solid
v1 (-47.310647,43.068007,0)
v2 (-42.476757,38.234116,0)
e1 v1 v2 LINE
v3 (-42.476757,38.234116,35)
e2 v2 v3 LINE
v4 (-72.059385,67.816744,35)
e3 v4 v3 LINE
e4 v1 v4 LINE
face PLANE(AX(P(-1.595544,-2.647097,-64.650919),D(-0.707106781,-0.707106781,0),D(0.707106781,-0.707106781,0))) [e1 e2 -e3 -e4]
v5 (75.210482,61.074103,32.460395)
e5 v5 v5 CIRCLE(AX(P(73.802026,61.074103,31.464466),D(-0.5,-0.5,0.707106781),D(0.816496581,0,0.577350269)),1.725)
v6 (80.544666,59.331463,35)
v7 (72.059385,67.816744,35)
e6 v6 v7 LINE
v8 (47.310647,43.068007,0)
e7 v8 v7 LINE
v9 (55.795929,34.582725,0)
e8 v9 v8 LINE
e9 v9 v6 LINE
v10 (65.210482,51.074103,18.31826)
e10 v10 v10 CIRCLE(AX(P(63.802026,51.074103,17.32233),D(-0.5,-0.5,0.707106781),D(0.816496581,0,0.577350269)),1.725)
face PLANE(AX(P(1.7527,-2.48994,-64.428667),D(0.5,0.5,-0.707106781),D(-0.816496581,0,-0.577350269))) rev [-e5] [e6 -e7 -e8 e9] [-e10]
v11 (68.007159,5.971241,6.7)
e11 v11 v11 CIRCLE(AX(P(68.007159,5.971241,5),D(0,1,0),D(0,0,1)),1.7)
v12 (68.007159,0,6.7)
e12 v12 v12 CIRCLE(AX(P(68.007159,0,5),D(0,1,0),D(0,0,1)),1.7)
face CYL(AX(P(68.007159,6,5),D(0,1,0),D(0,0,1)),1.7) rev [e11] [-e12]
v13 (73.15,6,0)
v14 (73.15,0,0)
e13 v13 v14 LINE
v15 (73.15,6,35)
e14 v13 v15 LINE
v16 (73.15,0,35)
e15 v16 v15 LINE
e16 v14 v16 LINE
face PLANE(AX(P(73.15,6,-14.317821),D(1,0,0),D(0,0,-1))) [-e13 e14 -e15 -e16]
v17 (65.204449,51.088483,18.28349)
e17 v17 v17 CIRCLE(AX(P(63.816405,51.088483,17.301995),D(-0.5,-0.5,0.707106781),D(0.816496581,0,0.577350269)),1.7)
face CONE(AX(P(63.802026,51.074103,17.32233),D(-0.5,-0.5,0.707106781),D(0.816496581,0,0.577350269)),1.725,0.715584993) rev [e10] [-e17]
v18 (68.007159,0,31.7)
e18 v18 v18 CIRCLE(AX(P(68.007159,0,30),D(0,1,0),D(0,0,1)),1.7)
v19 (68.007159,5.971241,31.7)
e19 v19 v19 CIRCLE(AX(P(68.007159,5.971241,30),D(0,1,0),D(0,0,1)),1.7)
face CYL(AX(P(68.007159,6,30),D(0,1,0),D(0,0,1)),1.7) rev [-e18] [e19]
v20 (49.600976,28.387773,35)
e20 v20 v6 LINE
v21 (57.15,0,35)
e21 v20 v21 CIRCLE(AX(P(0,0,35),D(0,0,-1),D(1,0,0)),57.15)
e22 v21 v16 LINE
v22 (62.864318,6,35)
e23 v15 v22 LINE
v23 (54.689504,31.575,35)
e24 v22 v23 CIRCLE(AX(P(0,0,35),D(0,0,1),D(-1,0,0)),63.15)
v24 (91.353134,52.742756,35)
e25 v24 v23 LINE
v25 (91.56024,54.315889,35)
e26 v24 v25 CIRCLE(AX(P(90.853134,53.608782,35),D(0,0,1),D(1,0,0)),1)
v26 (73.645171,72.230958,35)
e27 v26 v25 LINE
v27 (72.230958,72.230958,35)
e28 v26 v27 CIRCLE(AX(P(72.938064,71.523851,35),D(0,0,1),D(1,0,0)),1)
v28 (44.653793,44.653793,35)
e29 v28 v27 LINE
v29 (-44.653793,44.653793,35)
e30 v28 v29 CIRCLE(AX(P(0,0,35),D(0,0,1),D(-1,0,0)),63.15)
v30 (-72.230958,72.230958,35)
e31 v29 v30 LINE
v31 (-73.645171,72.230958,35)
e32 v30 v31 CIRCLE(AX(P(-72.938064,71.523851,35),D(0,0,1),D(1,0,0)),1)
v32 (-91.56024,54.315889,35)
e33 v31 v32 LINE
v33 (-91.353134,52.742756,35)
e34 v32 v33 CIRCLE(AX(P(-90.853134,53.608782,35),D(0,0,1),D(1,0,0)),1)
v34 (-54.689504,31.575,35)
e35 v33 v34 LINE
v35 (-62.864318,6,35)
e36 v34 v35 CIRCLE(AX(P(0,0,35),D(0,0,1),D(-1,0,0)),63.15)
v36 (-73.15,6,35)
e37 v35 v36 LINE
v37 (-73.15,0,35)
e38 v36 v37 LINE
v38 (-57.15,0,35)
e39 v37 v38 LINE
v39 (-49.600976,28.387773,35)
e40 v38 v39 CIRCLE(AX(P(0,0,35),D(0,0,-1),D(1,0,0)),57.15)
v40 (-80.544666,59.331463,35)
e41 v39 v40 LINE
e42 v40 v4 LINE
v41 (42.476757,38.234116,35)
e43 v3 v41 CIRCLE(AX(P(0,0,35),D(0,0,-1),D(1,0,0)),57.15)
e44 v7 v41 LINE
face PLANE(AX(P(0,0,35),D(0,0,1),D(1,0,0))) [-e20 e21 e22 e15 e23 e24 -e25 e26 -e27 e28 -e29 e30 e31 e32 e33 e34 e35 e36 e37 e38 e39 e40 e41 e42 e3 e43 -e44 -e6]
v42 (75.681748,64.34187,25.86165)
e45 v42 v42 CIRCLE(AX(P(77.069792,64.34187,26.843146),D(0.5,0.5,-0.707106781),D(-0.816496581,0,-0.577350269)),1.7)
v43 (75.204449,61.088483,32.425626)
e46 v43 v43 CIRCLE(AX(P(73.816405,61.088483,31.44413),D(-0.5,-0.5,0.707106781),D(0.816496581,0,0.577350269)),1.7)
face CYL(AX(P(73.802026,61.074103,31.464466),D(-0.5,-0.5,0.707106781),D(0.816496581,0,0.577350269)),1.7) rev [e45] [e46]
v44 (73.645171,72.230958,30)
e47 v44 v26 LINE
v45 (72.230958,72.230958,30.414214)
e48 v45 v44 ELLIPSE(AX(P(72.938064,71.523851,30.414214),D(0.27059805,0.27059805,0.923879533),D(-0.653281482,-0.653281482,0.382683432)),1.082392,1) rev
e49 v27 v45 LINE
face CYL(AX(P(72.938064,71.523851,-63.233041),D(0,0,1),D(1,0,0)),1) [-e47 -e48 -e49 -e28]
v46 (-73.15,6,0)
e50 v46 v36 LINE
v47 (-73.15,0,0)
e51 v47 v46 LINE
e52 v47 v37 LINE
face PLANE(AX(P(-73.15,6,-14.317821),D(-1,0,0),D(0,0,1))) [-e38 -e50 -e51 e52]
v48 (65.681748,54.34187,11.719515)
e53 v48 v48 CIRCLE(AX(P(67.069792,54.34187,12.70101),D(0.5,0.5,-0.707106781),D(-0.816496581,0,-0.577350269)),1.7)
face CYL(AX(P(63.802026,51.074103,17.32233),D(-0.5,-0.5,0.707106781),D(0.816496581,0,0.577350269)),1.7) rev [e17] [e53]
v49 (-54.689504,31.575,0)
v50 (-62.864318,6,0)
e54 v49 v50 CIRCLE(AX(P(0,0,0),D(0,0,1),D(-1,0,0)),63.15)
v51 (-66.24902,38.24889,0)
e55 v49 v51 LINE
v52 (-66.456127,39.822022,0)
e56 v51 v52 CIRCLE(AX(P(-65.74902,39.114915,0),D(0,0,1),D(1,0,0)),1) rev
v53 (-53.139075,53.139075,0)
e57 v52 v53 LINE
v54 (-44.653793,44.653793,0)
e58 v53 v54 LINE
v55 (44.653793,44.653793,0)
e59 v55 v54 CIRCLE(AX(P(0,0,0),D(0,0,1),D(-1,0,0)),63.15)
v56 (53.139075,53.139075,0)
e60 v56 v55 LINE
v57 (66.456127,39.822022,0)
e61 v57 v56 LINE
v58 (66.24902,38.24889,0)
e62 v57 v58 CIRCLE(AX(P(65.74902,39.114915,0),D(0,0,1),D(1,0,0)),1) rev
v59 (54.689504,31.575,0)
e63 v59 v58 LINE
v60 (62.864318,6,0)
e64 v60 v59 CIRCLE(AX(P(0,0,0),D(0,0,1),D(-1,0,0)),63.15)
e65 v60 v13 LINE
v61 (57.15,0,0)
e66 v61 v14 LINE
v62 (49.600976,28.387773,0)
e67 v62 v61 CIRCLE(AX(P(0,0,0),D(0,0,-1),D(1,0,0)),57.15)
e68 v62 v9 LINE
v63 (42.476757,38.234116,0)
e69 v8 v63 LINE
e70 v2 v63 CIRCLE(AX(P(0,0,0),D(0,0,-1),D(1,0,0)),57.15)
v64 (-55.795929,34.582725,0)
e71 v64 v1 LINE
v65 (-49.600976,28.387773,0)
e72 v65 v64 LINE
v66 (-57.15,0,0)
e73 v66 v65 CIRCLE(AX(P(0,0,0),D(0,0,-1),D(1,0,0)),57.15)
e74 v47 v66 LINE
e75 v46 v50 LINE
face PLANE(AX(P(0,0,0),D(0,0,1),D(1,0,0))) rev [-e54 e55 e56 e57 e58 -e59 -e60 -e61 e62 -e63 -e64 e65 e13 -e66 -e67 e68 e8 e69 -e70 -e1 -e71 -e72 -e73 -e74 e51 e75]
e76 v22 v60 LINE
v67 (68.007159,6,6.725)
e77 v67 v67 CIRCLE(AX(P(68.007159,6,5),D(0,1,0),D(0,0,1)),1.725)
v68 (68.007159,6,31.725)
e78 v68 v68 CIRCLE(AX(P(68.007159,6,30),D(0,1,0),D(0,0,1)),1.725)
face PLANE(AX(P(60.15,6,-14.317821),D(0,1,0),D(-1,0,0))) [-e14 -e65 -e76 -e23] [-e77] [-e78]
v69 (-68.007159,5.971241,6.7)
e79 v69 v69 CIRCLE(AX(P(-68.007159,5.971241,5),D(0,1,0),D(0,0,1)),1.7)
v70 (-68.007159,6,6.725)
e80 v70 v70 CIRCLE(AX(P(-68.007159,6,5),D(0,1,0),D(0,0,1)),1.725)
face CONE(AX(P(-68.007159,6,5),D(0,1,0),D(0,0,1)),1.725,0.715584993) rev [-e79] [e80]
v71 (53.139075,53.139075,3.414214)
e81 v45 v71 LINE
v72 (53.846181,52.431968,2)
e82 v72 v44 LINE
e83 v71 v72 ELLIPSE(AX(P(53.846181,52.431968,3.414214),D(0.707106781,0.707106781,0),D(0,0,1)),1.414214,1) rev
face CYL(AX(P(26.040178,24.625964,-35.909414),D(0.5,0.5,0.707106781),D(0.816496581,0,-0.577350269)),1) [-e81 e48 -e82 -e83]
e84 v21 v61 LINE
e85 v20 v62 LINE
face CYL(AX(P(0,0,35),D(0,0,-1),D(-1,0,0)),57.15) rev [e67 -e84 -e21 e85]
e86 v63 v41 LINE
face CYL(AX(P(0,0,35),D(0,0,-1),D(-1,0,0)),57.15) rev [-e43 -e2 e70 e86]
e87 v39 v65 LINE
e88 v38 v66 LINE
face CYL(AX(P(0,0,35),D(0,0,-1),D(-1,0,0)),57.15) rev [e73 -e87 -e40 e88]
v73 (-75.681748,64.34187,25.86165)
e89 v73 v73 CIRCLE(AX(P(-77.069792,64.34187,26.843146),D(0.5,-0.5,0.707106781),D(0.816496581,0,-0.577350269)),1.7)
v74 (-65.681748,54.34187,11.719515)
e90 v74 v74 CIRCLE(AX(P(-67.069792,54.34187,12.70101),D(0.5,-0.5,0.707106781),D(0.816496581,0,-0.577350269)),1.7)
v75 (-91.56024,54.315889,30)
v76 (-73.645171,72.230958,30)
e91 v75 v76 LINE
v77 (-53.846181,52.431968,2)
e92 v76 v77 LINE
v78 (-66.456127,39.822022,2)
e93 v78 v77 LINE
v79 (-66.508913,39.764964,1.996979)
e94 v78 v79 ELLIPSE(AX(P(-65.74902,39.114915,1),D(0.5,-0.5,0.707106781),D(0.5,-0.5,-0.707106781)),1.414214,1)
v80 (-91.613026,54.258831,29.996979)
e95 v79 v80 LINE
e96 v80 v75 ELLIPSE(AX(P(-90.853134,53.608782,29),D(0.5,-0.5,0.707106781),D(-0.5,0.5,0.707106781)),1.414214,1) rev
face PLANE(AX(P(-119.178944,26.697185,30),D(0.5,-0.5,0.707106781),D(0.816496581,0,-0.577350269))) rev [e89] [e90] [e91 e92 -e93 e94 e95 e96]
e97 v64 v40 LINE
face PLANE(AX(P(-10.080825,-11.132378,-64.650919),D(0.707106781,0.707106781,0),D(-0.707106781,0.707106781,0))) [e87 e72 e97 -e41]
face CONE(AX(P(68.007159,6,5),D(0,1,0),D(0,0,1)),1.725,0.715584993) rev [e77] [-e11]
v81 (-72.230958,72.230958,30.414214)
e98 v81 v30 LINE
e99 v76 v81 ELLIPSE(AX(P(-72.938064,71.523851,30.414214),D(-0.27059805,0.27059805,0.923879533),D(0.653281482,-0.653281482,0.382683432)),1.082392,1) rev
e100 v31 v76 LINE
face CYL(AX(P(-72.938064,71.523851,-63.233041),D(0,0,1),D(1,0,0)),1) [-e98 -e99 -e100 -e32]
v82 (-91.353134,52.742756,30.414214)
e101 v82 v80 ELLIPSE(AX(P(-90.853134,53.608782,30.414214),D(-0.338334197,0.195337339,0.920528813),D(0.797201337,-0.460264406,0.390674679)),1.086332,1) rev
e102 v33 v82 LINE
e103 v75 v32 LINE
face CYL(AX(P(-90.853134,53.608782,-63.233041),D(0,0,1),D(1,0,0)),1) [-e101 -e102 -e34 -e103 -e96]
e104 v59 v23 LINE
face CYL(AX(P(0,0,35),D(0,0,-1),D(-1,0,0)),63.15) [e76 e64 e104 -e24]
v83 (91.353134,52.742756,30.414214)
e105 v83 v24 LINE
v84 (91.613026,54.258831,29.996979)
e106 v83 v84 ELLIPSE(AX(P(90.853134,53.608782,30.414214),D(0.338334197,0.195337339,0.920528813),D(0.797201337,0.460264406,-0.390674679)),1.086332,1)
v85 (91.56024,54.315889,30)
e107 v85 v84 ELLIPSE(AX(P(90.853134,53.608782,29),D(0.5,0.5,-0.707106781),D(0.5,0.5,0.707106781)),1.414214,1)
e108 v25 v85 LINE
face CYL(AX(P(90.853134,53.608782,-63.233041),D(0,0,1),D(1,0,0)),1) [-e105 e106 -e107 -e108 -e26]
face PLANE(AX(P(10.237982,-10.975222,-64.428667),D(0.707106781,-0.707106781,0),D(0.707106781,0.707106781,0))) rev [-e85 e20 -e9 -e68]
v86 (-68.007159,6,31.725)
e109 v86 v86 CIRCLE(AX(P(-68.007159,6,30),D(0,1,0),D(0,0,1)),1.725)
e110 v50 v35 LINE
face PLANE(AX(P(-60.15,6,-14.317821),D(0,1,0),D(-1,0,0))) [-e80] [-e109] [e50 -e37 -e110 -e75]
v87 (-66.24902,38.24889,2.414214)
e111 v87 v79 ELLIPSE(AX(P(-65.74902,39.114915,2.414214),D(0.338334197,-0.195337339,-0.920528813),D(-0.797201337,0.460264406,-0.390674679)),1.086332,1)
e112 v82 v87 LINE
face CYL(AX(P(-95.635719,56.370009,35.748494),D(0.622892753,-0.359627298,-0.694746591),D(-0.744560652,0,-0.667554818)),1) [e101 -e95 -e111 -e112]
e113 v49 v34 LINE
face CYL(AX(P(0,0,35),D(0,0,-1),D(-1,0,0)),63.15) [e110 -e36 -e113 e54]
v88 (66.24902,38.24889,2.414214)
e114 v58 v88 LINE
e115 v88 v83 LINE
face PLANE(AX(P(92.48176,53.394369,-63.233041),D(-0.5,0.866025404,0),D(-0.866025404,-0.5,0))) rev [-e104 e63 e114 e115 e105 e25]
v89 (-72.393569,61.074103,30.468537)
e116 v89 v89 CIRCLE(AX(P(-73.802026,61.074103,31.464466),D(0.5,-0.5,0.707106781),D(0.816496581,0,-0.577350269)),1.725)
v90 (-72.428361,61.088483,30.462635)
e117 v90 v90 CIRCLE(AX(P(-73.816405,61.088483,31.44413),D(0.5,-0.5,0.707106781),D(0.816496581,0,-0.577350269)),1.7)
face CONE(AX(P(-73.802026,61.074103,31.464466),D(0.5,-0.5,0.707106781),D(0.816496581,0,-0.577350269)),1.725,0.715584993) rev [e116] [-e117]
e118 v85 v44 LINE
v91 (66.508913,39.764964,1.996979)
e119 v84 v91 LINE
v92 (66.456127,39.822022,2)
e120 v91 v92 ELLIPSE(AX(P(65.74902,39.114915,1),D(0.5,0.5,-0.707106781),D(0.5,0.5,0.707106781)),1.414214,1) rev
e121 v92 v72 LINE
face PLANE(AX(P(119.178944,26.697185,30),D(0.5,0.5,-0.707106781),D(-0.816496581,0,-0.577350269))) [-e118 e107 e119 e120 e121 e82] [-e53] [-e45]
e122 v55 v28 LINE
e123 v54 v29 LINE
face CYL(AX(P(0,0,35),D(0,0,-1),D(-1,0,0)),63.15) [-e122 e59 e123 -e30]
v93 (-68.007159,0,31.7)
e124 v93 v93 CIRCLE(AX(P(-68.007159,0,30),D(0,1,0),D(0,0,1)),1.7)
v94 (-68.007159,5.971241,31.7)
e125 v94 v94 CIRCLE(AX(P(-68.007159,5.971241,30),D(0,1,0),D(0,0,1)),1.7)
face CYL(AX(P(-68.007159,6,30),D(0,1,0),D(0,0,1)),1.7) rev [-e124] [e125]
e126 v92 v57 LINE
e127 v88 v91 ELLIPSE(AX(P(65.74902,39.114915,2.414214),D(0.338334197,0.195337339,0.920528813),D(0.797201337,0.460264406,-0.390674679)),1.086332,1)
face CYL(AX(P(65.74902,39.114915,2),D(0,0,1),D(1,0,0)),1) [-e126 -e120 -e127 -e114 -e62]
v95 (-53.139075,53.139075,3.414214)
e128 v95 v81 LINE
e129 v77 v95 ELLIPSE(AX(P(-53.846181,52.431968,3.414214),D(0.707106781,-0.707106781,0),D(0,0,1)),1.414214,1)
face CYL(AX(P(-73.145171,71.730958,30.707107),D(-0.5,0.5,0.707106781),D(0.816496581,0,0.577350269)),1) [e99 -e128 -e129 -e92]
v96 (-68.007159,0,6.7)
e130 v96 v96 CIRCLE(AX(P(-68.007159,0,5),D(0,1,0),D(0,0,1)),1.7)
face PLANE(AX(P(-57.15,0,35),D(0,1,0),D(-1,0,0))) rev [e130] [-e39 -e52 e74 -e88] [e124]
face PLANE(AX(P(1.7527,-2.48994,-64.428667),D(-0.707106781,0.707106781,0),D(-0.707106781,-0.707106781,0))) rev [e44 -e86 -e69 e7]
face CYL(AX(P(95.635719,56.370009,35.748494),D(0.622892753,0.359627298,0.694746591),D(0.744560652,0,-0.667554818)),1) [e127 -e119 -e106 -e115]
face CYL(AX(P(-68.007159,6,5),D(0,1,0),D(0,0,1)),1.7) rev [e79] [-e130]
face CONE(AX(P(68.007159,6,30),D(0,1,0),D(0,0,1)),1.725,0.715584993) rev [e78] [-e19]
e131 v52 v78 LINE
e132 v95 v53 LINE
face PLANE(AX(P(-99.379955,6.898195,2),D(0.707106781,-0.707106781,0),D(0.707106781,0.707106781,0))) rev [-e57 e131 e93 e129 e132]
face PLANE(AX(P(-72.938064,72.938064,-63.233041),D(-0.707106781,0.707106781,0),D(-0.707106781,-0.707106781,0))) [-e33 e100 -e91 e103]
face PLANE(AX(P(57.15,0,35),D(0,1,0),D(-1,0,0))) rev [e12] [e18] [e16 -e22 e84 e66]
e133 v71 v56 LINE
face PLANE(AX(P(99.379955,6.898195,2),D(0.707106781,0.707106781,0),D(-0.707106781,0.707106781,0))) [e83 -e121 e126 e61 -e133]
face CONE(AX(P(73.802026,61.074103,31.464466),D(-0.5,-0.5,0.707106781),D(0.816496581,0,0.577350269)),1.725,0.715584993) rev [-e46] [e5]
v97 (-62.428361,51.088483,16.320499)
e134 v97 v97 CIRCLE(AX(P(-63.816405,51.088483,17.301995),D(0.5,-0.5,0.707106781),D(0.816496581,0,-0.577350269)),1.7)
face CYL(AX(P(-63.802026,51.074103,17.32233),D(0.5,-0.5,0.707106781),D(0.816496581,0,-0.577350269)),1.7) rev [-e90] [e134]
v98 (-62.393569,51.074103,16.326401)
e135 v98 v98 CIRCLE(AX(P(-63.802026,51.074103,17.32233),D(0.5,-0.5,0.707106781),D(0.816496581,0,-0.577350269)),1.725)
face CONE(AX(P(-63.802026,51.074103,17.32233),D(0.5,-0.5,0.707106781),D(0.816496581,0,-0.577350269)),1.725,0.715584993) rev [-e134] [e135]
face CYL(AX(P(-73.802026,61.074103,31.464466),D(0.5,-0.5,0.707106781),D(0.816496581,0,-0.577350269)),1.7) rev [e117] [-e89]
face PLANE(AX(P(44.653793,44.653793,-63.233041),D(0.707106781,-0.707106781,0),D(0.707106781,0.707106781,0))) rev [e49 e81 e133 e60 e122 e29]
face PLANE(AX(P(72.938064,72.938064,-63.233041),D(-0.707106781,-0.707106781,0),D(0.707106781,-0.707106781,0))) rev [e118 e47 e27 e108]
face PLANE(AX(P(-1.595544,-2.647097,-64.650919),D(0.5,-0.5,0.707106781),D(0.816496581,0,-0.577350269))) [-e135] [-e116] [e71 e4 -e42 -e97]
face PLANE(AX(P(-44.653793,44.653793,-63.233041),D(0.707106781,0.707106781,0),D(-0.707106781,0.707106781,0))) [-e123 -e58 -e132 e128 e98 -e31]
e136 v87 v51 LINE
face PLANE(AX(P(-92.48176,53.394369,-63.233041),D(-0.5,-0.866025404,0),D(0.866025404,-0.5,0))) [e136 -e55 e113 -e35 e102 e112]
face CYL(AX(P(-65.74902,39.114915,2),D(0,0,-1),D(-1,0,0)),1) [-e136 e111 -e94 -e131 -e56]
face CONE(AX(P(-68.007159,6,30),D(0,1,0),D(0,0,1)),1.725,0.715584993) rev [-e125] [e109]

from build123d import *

# Parameters (mm, degrees)
EXTRUDE_1_DEPTH     = 35
EXTRUDE_START       = -35
EXTRUDE_2_DEPTH     = 35
CUT_EXTRUDE_1_DEPTH = 123.873256546
SKETCH_4_W          = 12
SKETCH_4_H          = 35
CUT_EXTRUDE_4_DEPTH = 165.71136734
FILLET_1_R          = 1
FILLET_2_R          = 1
SKETCH_5_W          = 13
SKETCH_5_H          = 6
EXTRUDE_4_DEPTH     = 35


# Read off the part's stored shape, not the designer's step: M3 すきま穴1, M3 すきま穴2
with BuildPart() as part:
    # ｽｹｯﾁ1 → ﾎﾞｽ - 押し出し1 (new body)
    with BuildSketch(Plane.XY):
        with BuildLine():
            Line((57.15, 0), (63.15, 0))
            ThreePointArc((63.15, 0), (0, 63.15), (-63.15, 0))
            Line((-63.15, 0), (-57.15, 0))
            ThreePointArc((-57.15, 0), (0, 57.15), (57.15, 0))
        make_face()
    extrude(amount=EXTRUDE_1_DEPTH)

    # ｽｹｯﾁ2 → ﾎﾞｽ - 押し出し2 (add)
    with BuildSketch(Plane.XY.offset(35).offset(EXTRUDE_START)):
        with BuildLine():
            Line((-44.653793232, 44.653793232), (-72.938064479, 72.938064479))
            Line((-72.938064479, 72.938064479), (-92.481759954, 53.394369005))
            Line((-92.481759954, 53.394369005), (-54.689504249, 31.575))
            ThreePointArc((-54.689504249, 31.575), (-50.100263439, 38.443284242), (-44.653793232, 44.653793232))
        make_face()
    extrude_2 = extrude(amount=EXTRUDE_2_DEPTH)

    # ｽｹｯﾁ3 → ｶｯﾄ - 押し出し1 (cut, through all)
    with BuildSketch(Plane(origin=(0, 0, 0), x_dir=(0, 0, -1), z_dir=(0.7071067811865461, 0.7071067811865489, 0))):
        Polygon((-30, 103.15), (-2, 75.15), (0, 75.15), (0, 103.15), align=None)
    cut_extrude_1 = extrude(amount=-CUT_EXTRUDE_1_DEPTH, mode=Mode.SUBTRACT)

    # ﾐﾗｰ1: ﾎﾞｽ - 押し出し2, ｶｯﾄ - 押し出し1 across plane
    add(extrude_2.mirror(Plane(origin=(0, 0, 0), x_dir=(0, 0, 1), z_dir=(1, 0, 0))))
    add(cut_extrude_1.mirror(Plane(origin=(0, 0, 0), x_dir=(0, 0, 1), z_dir=(1, 0, 0))), mode=Mode.SUBTRACT)

    # ｽｹｯﾁ4 → ｶｯﾄ - 押し出し4 (cut, through all)
    with BuildSketch(Plane(origin=(-48.84340091, 48.84340091, 69.075), x_dir=(-0.707106781186546, -0.707106781186549, 0), z_dir=(0.5000000000000019, -0.4999999999999998, -0.7071067811865465))):
        with Locations((9, 27.689327138)):
            Rectangle(SKETCH_4_W, SKETCH_4_H)
    cut_extrude_4 = extrude(amount=CUT_EXTRUDE_4_DEPTH, mode=Mode.SUBTRACT)

    # ﾌｨﾚｯﾄ1
    fillet_1_edges = [part.edges().sort_by_distance(p)[0] for p in [
        (-72.938064479, 72.938064479, 32.5),
        (-92.481759954, 53.394369005, 32.5),
        (-67.377646733, 38.900502479, 1),
        (-79.929703344, 46.147435742, 16),
        (-63.038569543, 63.038569543, 16),
    ]]
    fillet(fillet_1_edges, radius=FILLET_1_R)

    # ﾐﾗｰ3: ｶｯﾄ - 押し出し4 across plane
    add(cut_extrude_4.mirror(Plane(origin=(0, 0, 0), x_dir=(0, 0, 1), z_dir=(1, 0, 0))), mode=Mode.SUBTRACT)

    # ﾌｨﾚｯﾄ2
    fillet_2_edges = [part.edges().sort_by_distance(p)[0] for p in [
        (72.938064479, 72.938064479, 32.5),
        (92.481759954, 53.394369005, 32.5),
        (63.038569543, 63.038569543, 16),
        (79.929703344, 46.147435742, 16),
        (67.377646733, 38.900502479, 1),
    ]]
    fillet(fillet_2_edges, radius=FILLET_2_R)

    # ｽｹｯﾁ5 → ﾎﾞｽ - 押し出し4 (add)
    with BuildSketch(Plane.XY.offset(35)):
        with Locations((-66.65, 3)):
            Rectangle(SKETCH_5_W, SKETCH_5_H)
        with Locations((66.65, 3)):
            Rectangle(SKETCH_5_W, SKETCH_5_H)
    extrude(amount=-EXTRUDE_4_DEPTH)

    # M3 すきま穴1 outline → M3 すきま穴1 (revolve, cut)
    with BuildSketch(Plane(origin=(68.007159089, 0, 30), x_dir=(1, 0, 0), z_dir=(0, 0, 1))):
        Polygon((0, 0), (1.7, 0), (1.7, 5.97124079), (1.725, 6), (0, 6), align=None)
    revolve(axis=Axis((68.007159089, 0, 30), (0, 1, 0)), mode=Mode.SUBTRACT)

    # Hole Wizard M3 _1 2 outline → Hole Wizard M3 _1 2 (revolve, cut)
    with BuildSketch(Plane(origin=(68.007159089, 0, 5), x_dir=(1, 0, 0), z_dir=(0, 0, 1))):
        Polygon((0, 0), (1.7, 0), (1.7, 5.97124079), (1.725, 6), (0, 6), align=None)
    revolve(axis=Axis((68.007159089, 0, 5), (0, 1, 0)), mode=Mode.SUBTRACT)

    # Hole Wizard M3 _1 3 outline → Hole Wizard M3 _1 3 (revolve, cut)
    with BuildSketch(Plane(origin=(-68.007159089, 0, 30), x_dir=(1, 0, 0), z_dir=(0, 0, 1))):
        Polygon((0, 0), (1.7, 0), (1.7, 5.97124079), (1.725, 6), (0, 6), align=None)
    revolve(axis=Axis((-68.007159089, 0, 30), (0, 1, 0)), mode=Mode.SUBTRACT)

    # Hole Wizard M3 _1 4 outline → Hole Wizard M3 _1 4 (revolve, cut)
    with BuildSketch(Plane(origin=(-68.007159089, 0, 5), x_dir=(1, 0, 0), z_dir=(0, 0, 1))):
        Polygon((0, 0), (1.7, 0), (1.7, 5.97124079), (1.725, 6), (0, 6), align=None)
    revolve(axis=Axis((-68.007159089, 0, 5), (0, 1, 0)), mode=Mode.SUBTRACT)

    # M3 すきま穴2 outline → M3 すきま穴2 (revolve, cut)
    with BuildSketch(Plane(origin=(-41.207361941, 28.47943988, 49.276010127), x_dir=(0.8660254037844382, 0.28867513459481287, -0.4082482904638642), z_dir=(0, -0.8164965809277269, -0.5773502691896247))):
        Polygon((0, -51.724861044), (1.7, -51.724861044), (1.7, -45.218086348), (1.725, -45.189327138), (0, -45.189327138), align=None)
    hole_wizard_m3_2 = revolve(axis=Axis((-41.207361941, 28.47943988, 49.276010127), (0.500000000000001, -0.49999999999999883, 0.7071067811865479)), mode=Mode.SUBTRACT)

    # Hole Wizard M3 _2 2 outline → Hole Wizard M3 _2 2 (revolve, cut)
    with BuildSketch(Plane(origin=(-51.207361941, 38.47943988, 63.418145751), x_dir=(0.8660254037844382, 0.28867513459481287, -0.4082482904638642), z_dir=(0, -0.8164965809277269, -0.5773502691896247))):
        Polygon((0, -51.724861044), (1.7, -51.724861044), (1.7, -45.218086348), (1.725, -45.189327138), (0, -45.189327138), align=None)
    hole_wizard_m3_2_2 = revolve(axis=Axis((-51.207361941, 38.47943988, 63.418145751), (0.500000000000001, -0.49999999999999883, 0.7071067811865479)), mode=Mode.SUBTRACT)

    # ﾐﾗｰ5: M3 すきま穴2, Hole Wizard M3 _2 2 across plane
    add(hole_wizard_m3_2.mirror(Plane(origin=(0, 0, 0), x_dir=(0, 0, 1), z_dir=(1, 0, 0))), mode=Mode.SUBTRACT)
    add(hole_wizard_m3_2_2.mirror(Plane(origin=(0, 0, 0), x_dir=(0, 0, 1), z_dir=(1, 0, 0))), mode=Mode.SUBTRACT)


solid = part.part
